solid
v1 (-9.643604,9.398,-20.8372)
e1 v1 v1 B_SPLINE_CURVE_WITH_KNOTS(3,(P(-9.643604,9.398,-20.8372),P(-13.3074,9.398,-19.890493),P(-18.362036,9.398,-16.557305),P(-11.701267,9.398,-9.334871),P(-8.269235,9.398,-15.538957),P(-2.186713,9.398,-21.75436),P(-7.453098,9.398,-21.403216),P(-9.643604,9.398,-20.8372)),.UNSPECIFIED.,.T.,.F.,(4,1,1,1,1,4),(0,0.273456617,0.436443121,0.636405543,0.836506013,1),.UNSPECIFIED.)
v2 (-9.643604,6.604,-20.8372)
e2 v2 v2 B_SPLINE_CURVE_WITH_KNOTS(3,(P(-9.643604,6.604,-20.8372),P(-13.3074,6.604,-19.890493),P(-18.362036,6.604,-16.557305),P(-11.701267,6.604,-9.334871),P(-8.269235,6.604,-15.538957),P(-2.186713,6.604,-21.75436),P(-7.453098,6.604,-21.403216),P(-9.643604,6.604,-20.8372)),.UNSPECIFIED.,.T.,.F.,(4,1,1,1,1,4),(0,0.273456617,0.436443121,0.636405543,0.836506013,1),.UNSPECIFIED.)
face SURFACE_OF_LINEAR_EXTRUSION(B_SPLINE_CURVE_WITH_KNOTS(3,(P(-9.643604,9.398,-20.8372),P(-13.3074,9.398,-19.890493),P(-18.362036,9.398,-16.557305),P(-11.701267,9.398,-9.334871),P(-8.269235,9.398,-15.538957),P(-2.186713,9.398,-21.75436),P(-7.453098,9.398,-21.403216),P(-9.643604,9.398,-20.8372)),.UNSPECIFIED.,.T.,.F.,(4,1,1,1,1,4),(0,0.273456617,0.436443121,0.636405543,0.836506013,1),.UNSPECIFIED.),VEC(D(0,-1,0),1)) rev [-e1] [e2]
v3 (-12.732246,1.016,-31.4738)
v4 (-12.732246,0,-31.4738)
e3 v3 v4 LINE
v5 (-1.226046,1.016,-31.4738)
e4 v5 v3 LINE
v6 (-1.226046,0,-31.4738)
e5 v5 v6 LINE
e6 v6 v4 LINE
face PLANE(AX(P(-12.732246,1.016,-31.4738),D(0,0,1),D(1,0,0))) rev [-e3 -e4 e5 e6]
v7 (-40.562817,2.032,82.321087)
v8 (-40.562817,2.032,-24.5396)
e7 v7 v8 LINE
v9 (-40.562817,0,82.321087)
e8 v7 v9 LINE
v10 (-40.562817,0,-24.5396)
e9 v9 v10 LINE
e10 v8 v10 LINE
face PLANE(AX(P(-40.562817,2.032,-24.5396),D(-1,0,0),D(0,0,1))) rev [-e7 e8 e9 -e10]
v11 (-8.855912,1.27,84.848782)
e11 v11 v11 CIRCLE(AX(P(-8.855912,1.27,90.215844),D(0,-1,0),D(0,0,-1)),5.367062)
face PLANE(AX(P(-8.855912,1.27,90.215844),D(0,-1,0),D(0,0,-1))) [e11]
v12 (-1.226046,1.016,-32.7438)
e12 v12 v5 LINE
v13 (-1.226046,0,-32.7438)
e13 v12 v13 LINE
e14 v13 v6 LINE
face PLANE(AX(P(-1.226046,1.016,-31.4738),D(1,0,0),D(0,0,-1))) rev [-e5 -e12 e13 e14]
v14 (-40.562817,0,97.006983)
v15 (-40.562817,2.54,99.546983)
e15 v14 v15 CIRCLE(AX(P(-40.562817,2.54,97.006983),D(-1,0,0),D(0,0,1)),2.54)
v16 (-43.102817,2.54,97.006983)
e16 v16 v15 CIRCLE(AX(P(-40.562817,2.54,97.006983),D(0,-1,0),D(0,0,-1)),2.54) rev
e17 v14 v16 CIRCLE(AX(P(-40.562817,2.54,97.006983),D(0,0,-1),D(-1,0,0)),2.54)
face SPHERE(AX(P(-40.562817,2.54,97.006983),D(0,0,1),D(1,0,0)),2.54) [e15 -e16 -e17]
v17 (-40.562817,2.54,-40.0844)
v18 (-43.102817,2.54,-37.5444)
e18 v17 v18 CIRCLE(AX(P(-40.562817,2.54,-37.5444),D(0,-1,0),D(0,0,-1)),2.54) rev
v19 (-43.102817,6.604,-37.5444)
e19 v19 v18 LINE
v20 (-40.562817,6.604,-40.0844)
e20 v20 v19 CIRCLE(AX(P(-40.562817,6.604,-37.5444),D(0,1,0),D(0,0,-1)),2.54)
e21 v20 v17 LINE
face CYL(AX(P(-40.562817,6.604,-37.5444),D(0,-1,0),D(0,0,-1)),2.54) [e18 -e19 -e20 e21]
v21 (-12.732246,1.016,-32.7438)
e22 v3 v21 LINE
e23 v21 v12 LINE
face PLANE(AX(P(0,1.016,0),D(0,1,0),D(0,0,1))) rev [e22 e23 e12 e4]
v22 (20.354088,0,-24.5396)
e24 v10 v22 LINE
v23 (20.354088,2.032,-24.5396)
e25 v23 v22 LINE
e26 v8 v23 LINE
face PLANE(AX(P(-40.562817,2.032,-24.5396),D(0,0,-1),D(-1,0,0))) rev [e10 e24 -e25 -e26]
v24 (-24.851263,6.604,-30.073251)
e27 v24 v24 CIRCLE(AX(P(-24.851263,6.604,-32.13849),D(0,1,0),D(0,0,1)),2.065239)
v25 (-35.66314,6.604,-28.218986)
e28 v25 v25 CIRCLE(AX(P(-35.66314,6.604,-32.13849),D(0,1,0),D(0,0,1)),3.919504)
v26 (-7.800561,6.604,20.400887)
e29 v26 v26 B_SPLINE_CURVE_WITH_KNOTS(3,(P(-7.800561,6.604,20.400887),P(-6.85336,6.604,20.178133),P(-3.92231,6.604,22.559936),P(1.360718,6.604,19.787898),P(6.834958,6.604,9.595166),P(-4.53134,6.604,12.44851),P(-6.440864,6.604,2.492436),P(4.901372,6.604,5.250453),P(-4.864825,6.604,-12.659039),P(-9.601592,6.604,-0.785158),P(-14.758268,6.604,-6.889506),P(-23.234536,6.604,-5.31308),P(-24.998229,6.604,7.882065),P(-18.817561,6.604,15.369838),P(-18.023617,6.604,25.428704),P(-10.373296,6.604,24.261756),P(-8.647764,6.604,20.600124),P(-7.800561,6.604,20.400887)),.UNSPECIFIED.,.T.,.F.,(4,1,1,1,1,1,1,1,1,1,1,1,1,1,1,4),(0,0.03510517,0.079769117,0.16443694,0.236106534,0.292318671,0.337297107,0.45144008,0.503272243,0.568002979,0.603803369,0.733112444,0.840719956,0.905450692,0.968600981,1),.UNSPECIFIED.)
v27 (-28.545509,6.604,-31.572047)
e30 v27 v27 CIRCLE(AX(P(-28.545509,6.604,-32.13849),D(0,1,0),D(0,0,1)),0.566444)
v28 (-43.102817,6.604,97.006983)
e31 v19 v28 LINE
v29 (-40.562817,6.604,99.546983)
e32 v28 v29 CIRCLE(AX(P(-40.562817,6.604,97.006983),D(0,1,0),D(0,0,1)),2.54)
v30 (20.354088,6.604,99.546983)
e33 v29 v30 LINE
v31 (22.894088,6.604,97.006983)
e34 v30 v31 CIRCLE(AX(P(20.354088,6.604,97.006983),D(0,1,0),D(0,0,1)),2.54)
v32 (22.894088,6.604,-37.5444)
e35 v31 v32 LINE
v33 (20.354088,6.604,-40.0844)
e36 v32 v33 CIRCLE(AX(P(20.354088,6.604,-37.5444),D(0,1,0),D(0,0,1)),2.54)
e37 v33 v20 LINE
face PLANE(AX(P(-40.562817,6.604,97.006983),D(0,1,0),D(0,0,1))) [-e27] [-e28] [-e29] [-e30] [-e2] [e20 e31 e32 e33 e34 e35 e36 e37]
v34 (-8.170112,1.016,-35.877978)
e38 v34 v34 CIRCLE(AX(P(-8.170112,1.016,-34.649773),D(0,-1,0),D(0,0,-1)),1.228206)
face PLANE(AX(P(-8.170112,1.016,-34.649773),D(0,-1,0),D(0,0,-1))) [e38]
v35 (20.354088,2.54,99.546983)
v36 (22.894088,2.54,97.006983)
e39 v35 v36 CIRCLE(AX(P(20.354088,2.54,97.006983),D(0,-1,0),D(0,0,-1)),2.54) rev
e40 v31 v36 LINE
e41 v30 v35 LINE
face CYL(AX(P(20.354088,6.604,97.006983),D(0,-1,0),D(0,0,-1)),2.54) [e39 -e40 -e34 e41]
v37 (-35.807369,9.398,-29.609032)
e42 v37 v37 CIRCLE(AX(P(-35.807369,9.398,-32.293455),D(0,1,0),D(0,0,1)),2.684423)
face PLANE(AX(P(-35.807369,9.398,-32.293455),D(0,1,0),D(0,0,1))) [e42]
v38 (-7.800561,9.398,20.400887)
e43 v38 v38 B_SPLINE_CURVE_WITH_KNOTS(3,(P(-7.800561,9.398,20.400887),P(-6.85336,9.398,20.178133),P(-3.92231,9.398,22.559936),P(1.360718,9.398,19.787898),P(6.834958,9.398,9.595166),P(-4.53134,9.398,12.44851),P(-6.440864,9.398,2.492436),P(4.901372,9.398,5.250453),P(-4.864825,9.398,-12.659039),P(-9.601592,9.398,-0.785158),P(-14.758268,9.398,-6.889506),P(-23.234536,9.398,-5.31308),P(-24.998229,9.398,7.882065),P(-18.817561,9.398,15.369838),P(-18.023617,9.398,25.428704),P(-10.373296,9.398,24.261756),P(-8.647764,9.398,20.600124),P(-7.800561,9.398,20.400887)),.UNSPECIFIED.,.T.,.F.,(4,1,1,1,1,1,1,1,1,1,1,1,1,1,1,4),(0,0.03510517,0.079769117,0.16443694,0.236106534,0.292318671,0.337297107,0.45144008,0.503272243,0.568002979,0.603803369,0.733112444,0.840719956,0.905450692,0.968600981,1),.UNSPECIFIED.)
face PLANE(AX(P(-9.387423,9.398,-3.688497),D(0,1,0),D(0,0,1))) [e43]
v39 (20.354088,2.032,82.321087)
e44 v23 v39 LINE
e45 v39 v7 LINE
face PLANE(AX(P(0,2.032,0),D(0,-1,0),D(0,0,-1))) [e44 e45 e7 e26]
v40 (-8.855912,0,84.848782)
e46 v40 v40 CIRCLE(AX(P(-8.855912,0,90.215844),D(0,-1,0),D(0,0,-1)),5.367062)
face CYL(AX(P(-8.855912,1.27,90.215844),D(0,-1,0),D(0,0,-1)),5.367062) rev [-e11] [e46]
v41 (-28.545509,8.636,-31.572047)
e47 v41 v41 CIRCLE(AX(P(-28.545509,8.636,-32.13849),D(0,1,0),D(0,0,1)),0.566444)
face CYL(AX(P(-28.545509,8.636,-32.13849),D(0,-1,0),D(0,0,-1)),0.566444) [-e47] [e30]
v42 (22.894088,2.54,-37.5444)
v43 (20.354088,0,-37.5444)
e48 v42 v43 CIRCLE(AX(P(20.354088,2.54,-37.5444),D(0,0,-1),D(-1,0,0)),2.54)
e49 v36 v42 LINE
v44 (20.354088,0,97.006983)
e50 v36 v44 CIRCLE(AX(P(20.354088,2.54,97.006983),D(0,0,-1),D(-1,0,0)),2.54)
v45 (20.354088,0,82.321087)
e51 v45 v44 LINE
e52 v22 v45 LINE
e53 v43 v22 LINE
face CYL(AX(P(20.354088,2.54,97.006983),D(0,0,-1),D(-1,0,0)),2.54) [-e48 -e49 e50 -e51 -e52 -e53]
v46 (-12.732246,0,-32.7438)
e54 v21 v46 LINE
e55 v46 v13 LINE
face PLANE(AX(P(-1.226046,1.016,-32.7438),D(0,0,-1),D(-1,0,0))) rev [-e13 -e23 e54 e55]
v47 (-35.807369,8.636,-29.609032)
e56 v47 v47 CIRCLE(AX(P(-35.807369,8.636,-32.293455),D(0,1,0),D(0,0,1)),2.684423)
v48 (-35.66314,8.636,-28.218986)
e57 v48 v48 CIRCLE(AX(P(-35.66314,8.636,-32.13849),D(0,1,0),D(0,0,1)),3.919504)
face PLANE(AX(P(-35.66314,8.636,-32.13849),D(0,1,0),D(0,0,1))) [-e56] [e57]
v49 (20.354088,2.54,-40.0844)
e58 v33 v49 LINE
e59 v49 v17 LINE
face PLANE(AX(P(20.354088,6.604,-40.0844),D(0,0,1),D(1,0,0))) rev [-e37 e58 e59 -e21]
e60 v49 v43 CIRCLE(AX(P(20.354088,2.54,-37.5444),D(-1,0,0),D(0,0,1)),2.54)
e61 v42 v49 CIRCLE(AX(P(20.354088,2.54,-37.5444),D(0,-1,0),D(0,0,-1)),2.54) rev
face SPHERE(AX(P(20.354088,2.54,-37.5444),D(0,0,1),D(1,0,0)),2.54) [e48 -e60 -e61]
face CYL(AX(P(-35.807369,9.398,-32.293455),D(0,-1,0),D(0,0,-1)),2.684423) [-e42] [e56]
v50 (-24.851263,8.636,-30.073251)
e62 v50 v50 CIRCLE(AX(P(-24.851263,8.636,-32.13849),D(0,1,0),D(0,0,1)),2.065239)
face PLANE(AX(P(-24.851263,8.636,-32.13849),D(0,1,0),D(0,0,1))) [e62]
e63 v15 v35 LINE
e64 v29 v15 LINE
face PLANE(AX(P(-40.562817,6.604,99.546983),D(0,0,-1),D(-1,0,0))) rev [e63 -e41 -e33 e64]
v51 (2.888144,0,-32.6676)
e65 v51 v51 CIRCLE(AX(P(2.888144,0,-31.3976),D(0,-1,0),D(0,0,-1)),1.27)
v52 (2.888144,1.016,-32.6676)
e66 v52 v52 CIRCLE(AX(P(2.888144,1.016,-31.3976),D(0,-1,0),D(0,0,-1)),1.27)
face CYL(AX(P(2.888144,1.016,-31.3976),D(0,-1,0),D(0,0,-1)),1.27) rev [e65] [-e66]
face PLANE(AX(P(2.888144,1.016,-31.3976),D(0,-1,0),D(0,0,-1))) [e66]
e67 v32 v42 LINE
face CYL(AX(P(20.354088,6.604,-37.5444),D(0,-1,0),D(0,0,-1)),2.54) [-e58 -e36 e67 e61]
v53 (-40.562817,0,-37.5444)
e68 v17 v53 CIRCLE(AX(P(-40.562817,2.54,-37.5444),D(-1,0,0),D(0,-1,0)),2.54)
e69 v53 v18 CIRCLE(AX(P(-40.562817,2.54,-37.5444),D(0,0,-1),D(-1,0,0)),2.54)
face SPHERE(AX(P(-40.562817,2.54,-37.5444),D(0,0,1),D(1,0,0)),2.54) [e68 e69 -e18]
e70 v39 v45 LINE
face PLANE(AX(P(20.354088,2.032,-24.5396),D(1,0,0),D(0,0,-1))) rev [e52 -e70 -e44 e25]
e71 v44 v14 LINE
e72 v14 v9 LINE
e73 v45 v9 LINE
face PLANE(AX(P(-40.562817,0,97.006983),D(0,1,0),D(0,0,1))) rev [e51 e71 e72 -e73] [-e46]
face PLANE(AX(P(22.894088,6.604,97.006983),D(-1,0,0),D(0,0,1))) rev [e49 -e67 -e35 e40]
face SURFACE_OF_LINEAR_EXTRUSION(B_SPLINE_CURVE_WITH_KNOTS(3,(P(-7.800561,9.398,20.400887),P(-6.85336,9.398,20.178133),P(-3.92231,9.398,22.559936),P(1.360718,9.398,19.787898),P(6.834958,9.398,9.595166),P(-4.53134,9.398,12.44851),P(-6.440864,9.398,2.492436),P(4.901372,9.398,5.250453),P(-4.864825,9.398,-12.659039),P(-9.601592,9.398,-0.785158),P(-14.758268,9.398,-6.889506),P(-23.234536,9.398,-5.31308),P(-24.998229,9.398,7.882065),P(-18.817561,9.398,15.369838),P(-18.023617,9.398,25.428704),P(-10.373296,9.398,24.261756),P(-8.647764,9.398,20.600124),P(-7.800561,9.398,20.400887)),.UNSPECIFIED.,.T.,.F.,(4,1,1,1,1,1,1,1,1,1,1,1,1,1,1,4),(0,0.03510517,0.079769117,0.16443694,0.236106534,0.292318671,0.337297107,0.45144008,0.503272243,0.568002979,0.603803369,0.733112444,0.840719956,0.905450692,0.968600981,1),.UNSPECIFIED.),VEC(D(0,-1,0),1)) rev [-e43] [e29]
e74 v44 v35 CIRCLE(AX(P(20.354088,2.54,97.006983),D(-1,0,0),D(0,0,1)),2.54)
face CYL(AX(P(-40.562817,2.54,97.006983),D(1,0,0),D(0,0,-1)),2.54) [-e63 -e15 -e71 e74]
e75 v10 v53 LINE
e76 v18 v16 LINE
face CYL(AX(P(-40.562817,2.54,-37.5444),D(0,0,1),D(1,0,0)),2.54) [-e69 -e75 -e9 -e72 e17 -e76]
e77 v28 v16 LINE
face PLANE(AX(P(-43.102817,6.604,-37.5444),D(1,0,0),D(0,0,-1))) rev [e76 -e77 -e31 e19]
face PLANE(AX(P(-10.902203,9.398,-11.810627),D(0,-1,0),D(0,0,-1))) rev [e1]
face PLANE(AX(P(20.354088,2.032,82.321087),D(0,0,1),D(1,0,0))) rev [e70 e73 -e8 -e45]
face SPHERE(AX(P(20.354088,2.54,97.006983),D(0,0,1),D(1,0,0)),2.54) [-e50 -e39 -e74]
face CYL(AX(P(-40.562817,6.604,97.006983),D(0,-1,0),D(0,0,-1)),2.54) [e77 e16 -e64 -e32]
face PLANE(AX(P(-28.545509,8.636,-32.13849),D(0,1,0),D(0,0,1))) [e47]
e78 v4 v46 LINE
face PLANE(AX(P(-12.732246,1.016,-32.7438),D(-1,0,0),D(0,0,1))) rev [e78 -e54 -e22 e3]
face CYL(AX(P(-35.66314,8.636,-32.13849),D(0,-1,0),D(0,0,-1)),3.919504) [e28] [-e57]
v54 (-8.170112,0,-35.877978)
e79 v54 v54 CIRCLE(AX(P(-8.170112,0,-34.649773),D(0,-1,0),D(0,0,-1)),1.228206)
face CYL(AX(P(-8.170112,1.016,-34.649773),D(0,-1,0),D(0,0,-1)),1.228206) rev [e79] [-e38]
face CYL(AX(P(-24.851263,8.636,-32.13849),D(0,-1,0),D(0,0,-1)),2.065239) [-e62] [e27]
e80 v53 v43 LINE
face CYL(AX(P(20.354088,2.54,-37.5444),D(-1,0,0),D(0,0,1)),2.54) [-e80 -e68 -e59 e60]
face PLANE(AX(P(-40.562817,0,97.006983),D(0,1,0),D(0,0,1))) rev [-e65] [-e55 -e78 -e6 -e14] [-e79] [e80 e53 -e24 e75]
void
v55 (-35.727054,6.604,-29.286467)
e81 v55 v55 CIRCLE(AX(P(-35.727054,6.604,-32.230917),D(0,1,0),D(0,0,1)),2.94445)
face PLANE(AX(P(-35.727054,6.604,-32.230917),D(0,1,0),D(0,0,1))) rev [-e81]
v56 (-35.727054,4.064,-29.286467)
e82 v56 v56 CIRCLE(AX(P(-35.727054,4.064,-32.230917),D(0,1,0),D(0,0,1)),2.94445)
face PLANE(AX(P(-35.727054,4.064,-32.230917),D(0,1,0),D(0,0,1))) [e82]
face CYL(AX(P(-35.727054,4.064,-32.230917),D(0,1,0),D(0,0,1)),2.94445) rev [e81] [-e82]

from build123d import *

# Parameters (mm, degrees)
BOSS_EXTRUDE1_DEPTH = 6.604
SKETCH2_R           = 3.919504197
SKETCH2_R_2         = 0.566443641
SKETCH2_R_3         = 2.065239225
BOSS_EXTRUDE2_DEPTH = 2.032
SKETCH3_W           = 60.9169051
SKETCH3_H           = 106.860686568
CUT_EXTRUDE1_DEPTH  = 2.032
SKETCH4_R           = 5.367061821
CUT_EXTRUDE2_DEPTH  = 1.27
SKETCH5_R           = 1.27
SKETCH5_R_2         = 1.228205677
SKETCH5_W           = 11.5062
SKETCH5_H           = 1.27
CUT_EXTRUDE3_DEPTH  = 1.016
FILLET1_R           = 2.54
SKETCH7_R           = 2.94444965
CUT_EXTRUDE4_DEPTH  = 2.54
SKETCH8_R           = 2.684422541
BOSS_EXTRUDE3_DEPTH = 0.762
BOSS_EXTRUDE4_DEPTH = 2.794


with BuildPart() as part:
    # Sketch1 → Boss-Extrude1 (new body)
    with BuildSketch(Plane(origin=(0, 0, 0), x_dir=(1, 0, 0), z_dir=(0, 1, 0))):
        with BuildLine():
            Line((-43.10281748, 37.544399845), (-43.10281748, -97.006983228))
            ThreePointArc((-43.10281748, -97.006983228), (-42.358868704, -98.803034452), (-40.56281748, -99.546983228))
            Line((-40.56281748, -99.546983228), (20.35408762, -99.546983228))
            ThreePointArc((20.35408762, -99.546983228), (22.150138844, -98.803034452), (22.89408762, -97.006983228))
            Line((22.89408762, -97.006983228), (22.89408762, 37.544399845))
            ThreePointArc((22.89408762, 37.544399845), (22.150138844, 39.340451069), (20.35408762, 40.084399845))
            Line((20.35408762, 40.084399845), (-40.56281748, 40.084399845))
            ThreePointArc((-40.56281748, 40.084399845), (-42.358868704, 39.340451069), (-43.10281748, 37.544399845))
        make_face()
    extrude(amount=BOSS_EXTRUDE1_DEPTH)

    # Sketch2 → Boss-Extrude2 (add)
    with BuildSketch(Plane(origin=(0, 6.604, 0), x_dir=(1, 0, 0), z_dir=(0, 1, 0))):
        with Locations(Location((-35.663139583, 32.138490209, 0), (0, 0, 270))):
            Circle(SKETCH2_R)
        with Locations(Location((-28.54550888, 32.138490209, 0), (0, 0, 270))):
            Circle(SKETCH2_R_2)
        with Locations(Location((-24.851263483, 32.138490209, 0), (0, 0, 270))):
            Circle(SKETCH2_R_3)
    extrude(amount=BOSS_EXTRUDE2_DEPTH)

    # Sketch3 → Cut-Extrude1 (cut)
    with BuildSketch(Plane(origin=(0, 0, 0), x_dir=(-1, 0, 0), z_dir=(0, -1, 0))):
        with Locations((10.10436493, -28.890743439)):
            Rectangle(SKETCH3_W, SKETCH3_H)
    extrude(amount=-CUT_EXTRUDE1_DEPTH, mode=Mode.SUBTRACT)

    # Sketch4 → Cut-Extrude2 (cut)
    with BuildSketch(Plane(origin=(0, 0, 0), x_dir=(-1, 0, 0), z_dir=(0, -1, 0))):
        with Locations(Location((8.85591238, -90.215843688, 0), (0, 0, 90))):
            Circle(SKETCH4_R)
    extrude(amount=-CUT_EXTRUDE2_DEPTH, mode=Mode.SUBTRACT)

    # Sketch5 → Cut-Extrude3 (cut)
    with BuildSketch(Plane(origin=(0, 0, 0), x_dir=(-1, 0, 0), z_dir=(0, -1, 0))):
        with Locations(Location((-2.888143629, 31.397599845, 0), (0, 0, 90))):
            Circle(SKETCH5_R)
        with Locations(Location((8.17011238, 34.649772777, 0), (0, 0, 90))):
            Circle(SKETCH5_R_2)
        with Locations((6.979145606, 32.108799845)):
            Rectangle(SKETCH5_W, SKETCH5_H)
    extrude(amount=-CUT_EXTRUDE3_DEPTH, mode=Mode.SUBTRACT)

    # Fillet1
    fillet1_edges = [part.edges().sort_by_distance(p)[0] for p in [
        (-10.10436493, 0, 99.546983228),
        (-42.358868704, 0, 98.803034452),
        (-43.10281748, 0, 29.731291691),
        (-42.358868704, 0, -39.340451069),
        (-10.10436493, 0, -40.084399845),
        (22.150138844, 0, -39.340451069),
        (22.89408762, 0, 29.731291691),
        (22.150138844, 0, 98.803034452),
    ]]
    fillet(fillet1_edges, radius=FILLET1_R - 0.0001)  # a hair under: the kernel refuses the full size

    # Sketch7 → Cut-Extrude4 (cut)
    with BuildSketch(Plane(origin=(0, 6.604, 0), x_dir=(1, 0, 0), z_dir=(0, 1, 0))):
        with Locations(Location((-35.727053618, 32.230916755, 0), (0, 0, 270))):
            Circle(SKETCH7_R)
    extrude(amount=-CUT_EXTRUDE4_DEPTH, mode=Mode.SUBTRACT)

    # Sketch8 → Boss-Extrude3 (add)
    with BuildSketch(Plane(origin=(0, 8.636, 0), x_dir=(1, 0, 0), z_dir=(0, 1, 0))):
        with Locations(Location((-35.807369042, 32.29345464, 0), (0, 0, 270))):
            Circle(SKETCH8_R)
    extrude(amount=BOSS_EXTRUDE3_DEPTH)

    # Sketch9 → Boss-Extrude4 (add)
    with BuildSketch(Plane(origin=(0, 6.604, 0), x_dir=(1, 0, 0), z_dir=(0, 1, 0))):
        with BuildLine():
            add(Edge.make_bspline(
                [(-7.80056122, -20.400886664), (-6.853360215, -20.178132505), (-3.922309563, -22.559935581), (1.360717881, -19.787898202), (6.834958004, -9.595166337), (-4.531339922, -12.448510053), (-6.44086429, -2.492436288), (4.901372473, -5.250452874), (-4.864824897, 12.659038777), (-9.601591513, 0.785158014), (-14.758268239, 6.889505713), (-23.234536447, 5.313079767), (-24.998229305, -7.882064839), (-18.817560553, -15.369837595), (-18.02361733, -25.428704355), (-10.373296019, -24.261756275), (-8.647763554, -20.600124041), (-7.80056122, -20.400886664)],
                knots=[0, 0, 0, 0, 0.03510517, 0.079769117, 0.16443694, 0.236106534, 0.292318671, 0.337297107, 0.45144008, 0.503272243, 0.568002979, 0.603803369, 0.733112444, 0.840719956, 0.905450692, 0.968600981, 1, 1, 1, 1], degree=3))
        make_face()
        with BuildLine():
            add(Edge.make_bspline(
                [(-9.643604188, 20.837199752), (-13.307399758, 19.890492956), (-18.362036209, 16.557305032), (-11.701266913, 9.334871489), (-8.26923518, 15.538956926), (-2.186712873, 21.75435962), (-7.453097508, 21.403215929), (-9.643604188, 20.837199752)],
                knots=[0, 0, 0, 0, 0.273456617, 0.436443121, 0.636405543, 0.836506013, 1, 1, 1, 1], degree=3))
        make_face()
    extrude(amount=BOSS_EXTRUDE4_DEPTH)


solid = part.part
